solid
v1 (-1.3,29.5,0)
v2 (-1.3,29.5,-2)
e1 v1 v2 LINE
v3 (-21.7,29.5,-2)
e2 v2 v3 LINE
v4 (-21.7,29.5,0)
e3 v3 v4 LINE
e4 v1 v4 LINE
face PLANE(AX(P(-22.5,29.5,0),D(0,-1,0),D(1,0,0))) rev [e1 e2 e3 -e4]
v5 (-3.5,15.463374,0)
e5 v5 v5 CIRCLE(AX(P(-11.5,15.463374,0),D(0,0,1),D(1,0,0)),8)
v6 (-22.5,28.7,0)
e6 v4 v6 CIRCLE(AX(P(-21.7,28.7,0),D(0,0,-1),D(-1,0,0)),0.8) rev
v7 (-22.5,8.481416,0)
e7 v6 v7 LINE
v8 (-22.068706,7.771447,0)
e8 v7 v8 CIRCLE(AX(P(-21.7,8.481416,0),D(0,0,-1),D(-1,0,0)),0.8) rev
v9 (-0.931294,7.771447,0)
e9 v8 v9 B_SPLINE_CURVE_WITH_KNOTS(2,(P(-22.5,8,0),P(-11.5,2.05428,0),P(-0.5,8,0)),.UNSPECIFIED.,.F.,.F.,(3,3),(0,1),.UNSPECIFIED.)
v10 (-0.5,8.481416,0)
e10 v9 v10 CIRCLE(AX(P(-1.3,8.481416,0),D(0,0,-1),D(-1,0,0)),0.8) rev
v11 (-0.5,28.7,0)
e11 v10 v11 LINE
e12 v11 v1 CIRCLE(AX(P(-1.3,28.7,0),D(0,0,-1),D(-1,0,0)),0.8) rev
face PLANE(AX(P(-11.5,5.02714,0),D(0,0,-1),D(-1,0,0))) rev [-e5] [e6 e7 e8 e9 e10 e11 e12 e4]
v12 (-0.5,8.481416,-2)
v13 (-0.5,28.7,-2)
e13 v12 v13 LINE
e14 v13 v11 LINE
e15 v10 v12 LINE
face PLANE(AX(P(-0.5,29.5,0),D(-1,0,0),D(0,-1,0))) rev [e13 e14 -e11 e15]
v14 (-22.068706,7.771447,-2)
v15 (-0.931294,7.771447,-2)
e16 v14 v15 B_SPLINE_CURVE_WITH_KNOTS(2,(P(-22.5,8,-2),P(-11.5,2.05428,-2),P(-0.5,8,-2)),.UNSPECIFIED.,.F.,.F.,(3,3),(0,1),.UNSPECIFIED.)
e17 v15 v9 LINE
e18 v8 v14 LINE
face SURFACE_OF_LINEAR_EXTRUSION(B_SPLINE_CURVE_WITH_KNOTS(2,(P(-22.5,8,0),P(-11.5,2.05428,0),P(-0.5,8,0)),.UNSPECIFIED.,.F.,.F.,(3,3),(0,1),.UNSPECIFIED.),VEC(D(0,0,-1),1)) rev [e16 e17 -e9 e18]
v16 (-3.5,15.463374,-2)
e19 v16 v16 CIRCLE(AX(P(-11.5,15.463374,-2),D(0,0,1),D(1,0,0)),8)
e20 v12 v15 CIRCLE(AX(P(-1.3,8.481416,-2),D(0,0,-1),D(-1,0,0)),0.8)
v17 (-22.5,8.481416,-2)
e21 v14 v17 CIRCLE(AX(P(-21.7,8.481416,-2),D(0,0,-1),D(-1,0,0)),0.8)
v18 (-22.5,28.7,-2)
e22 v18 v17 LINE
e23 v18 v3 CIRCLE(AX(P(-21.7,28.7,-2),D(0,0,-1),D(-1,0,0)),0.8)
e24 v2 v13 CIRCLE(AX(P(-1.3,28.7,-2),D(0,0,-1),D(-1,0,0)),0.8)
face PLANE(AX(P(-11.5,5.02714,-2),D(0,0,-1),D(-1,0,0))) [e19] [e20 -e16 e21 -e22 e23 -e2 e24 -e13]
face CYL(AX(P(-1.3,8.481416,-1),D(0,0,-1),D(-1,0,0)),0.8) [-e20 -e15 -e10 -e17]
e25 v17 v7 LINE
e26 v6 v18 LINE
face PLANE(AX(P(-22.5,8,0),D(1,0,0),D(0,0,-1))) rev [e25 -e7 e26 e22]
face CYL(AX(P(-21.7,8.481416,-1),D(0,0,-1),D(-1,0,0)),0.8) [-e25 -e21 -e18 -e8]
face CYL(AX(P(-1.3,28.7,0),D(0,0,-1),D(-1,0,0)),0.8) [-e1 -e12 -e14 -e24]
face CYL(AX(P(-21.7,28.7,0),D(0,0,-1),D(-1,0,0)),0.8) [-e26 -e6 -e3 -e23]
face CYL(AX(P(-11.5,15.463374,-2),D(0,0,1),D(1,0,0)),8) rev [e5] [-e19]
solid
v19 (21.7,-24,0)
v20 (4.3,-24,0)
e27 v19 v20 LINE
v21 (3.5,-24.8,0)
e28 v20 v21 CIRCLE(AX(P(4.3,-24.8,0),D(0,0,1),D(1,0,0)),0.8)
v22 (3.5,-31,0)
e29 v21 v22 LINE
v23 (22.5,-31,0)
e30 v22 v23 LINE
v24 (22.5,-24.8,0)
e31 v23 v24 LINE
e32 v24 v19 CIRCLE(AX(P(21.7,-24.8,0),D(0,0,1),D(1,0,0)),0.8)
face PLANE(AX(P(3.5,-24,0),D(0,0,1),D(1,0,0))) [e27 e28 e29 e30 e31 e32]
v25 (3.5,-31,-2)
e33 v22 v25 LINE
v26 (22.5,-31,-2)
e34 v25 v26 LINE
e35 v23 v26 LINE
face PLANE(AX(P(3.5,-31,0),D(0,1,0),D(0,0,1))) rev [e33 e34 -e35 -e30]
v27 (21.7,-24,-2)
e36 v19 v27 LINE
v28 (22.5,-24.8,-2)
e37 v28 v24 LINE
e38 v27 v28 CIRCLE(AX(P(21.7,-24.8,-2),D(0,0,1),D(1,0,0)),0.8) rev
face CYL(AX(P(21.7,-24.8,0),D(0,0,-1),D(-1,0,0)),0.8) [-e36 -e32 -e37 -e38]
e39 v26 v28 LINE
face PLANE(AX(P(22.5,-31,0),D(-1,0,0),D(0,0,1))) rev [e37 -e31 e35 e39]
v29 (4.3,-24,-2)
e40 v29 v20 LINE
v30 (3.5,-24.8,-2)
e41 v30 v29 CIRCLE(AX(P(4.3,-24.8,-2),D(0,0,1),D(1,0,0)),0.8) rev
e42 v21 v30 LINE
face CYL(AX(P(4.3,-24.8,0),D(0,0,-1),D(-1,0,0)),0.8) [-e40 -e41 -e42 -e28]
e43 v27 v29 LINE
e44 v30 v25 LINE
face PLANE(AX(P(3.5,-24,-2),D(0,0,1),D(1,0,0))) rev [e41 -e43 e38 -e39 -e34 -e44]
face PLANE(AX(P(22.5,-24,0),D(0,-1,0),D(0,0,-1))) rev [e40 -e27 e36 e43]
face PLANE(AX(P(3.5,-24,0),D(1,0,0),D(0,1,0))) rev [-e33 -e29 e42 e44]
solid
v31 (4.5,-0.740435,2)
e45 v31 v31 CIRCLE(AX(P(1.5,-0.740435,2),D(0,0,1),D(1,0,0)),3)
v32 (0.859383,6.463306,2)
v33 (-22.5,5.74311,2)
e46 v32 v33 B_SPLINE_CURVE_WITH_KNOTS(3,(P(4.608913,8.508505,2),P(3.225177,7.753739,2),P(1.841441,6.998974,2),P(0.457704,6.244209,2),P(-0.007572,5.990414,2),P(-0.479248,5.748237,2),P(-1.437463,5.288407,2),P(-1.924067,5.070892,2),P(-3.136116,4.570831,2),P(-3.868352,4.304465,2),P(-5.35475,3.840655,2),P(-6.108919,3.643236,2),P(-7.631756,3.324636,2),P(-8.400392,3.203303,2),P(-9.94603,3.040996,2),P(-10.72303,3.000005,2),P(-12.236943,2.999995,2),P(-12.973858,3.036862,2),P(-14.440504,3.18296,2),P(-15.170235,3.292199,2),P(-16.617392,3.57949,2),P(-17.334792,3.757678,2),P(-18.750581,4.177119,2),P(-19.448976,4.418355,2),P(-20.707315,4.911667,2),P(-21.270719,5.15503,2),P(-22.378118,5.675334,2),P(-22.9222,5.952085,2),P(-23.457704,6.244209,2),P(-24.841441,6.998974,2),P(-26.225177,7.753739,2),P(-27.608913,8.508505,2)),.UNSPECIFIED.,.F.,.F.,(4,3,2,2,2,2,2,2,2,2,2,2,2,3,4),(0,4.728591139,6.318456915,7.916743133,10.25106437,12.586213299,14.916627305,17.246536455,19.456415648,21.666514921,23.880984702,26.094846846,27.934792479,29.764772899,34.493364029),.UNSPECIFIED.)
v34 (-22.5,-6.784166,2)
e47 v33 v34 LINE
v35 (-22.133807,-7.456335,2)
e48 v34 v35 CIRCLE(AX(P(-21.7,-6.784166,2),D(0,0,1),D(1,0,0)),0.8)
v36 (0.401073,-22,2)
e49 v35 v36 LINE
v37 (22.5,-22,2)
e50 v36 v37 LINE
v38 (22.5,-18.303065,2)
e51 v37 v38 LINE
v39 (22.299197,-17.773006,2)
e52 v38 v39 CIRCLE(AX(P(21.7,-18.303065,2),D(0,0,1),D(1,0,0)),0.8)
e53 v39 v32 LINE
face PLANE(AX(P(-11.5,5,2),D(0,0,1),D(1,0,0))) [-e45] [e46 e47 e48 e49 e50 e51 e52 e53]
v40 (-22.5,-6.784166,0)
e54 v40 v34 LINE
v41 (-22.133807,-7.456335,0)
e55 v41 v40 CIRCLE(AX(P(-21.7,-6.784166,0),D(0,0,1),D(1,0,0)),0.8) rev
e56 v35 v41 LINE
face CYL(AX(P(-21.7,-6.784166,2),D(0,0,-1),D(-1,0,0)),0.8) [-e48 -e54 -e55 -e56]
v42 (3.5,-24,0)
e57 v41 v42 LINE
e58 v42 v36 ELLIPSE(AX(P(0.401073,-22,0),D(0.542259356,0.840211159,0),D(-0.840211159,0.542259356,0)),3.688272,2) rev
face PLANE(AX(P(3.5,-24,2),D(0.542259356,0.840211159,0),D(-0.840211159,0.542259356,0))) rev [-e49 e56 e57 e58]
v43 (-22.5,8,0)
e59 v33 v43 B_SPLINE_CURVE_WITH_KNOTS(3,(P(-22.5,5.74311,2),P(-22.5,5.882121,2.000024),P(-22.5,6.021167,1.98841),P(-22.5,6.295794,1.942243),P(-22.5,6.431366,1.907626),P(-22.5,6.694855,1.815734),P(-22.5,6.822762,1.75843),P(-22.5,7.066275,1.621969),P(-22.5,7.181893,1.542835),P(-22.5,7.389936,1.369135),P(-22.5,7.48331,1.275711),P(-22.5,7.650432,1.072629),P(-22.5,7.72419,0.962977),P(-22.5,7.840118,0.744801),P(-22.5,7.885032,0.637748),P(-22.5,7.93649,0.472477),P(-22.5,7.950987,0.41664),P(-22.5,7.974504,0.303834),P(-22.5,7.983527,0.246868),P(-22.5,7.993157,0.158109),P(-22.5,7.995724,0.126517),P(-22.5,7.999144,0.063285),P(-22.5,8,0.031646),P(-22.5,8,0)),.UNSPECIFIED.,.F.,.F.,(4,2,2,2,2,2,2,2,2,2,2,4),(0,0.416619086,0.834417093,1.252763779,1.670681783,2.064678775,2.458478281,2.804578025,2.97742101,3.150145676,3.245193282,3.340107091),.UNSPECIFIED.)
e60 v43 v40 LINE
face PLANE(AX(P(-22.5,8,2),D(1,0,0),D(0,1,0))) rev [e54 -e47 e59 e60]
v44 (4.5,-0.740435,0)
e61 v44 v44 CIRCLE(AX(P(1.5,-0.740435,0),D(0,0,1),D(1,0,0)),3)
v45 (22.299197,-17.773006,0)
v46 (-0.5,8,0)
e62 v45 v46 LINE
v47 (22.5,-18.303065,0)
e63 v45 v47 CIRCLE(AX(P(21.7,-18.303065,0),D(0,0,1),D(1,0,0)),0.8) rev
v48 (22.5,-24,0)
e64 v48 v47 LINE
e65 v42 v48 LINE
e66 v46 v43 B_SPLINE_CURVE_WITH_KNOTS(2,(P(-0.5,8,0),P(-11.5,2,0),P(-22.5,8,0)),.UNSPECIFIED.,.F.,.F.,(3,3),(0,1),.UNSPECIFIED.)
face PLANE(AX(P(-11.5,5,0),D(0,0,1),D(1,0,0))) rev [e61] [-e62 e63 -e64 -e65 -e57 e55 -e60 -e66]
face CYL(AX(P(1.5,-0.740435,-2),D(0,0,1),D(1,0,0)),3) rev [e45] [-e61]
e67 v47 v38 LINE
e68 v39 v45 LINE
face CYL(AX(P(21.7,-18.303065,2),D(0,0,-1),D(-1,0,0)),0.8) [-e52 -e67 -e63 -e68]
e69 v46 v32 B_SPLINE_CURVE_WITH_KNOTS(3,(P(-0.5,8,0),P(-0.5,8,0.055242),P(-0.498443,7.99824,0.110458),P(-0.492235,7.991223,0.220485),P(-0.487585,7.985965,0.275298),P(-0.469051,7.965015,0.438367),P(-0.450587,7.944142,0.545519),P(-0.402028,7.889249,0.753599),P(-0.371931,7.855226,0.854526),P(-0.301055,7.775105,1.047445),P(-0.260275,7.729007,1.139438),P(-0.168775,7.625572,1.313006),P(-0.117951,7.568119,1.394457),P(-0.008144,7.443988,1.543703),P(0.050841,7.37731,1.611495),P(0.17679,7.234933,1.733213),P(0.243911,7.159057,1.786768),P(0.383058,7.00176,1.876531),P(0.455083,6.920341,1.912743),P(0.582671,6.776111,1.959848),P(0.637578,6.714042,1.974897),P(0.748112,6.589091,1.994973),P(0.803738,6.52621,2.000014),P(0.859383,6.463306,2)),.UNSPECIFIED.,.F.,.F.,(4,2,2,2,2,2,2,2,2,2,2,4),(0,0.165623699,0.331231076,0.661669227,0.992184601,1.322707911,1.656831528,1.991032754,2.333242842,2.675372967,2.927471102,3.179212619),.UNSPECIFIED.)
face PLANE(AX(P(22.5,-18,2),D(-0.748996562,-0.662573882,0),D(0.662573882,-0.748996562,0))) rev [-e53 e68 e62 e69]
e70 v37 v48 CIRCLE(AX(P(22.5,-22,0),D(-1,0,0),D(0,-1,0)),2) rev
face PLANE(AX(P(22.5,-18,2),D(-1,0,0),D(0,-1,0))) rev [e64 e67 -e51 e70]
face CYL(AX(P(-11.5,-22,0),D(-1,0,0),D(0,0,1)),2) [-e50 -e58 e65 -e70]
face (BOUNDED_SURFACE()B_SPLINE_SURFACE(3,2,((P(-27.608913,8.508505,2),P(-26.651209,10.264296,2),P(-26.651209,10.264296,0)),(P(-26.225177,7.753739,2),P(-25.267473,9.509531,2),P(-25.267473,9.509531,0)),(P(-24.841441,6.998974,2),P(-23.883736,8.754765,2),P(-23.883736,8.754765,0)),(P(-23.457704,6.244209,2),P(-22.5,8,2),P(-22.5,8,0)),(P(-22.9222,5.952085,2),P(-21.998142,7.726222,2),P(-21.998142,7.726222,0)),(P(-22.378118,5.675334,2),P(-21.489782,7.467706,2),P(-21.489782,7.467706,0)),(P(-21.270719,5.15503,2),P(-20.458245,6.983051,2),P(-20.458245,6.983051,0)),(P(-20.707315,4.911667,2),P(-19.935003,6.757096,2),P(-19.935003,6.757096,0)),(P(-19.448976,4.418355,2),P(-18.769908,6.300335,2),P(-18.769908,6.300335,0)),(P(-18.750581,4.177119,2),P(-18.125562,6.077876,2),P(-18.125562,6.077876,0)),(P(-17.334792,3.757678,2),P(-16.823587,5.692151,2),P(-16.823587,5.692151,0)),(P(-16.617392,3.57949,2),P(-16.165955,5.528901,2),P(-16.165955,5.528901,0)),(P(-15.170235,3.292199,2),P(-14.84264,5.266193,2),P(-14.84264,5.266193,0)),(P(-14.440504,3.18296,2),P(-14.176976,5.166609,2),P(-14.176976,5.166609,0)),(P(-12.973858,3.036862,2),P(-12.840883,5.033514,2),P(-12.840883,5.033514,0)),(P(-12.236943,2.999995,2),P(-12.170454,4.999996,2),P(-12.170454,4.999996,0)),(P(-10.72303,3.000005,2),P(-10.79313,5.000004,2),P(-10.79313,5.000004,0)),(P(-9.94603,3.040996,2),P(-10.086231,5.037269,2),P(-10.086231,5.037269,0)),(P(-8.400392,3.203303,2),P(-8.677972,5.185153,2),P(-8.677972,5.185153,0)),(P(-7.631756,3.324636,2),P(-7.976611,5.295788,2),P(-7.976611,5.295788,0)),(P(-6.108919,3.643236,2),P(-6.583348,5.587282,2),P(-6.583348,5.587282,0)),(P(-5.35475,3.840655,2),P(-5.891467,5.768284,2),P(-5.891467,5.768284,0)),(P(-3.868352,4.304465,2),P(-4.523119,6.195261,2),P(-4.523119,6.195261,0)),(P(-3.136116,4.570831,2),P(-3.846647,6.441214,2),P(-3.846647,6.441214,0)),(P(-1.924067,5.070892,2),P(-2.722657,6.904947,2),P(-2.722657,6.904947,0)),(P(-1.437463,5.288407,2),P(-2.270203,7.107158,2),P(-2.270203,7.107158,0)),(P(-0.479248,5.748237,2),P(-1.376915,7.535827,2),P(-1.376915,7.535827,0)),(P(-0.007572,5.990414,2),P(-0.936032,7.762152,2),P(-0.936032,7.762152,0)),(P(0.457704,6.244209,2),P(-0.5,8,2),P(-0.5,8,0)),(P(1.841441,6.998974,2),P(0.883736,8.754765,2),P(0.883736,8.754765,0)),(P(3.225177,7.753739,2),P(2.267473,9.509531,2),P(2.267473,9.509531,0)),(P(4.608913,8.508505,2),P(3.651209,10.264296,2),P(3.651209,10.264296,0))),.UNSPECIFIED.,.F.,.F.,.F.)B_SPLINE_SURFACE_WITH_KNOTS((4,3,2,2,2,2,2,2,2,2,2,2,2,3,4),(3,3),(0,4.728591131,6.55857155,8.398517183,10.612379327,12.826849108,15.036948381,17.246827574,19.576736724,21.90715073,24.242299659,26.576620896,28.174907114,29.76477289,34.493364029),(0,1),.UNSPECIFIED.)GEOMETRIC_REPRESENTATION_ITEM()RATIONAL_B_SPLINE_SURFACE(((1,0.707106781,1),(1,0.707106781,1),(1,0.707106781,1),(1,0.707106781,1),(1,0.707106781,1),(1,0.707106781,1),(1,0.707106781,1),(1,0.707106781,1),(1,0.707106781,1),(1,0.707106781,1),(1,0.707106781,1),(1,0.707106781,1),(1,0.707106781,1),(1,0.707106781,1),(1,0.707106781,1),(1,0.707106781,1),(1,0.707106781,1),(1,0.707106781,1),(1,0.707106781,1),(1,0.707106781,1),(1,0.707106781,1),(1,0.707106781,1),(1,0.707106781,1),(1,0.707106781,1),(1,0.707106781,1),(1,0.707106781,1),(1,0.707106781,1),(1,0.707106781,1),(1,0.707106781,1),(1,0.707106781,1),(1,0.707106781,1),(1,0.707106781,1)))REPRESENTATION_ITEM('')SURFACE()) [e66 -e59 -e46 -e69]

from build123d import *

# Parameters (mm, degrees)
BOSS_EXTRUDE1_DEPTH    = 2
SKETCH25_W             = 19
SKETCH25_H             = 7
BOSS_EXTRUDE14_DEPTH   = 2
BOSS_EXTRUDE14_2_DEPTH = 2
SKETCH26_R             = 8
CUT_EXTRUDE4_DEPTH     = 39.356876892
SKETCH27_R             = 3
CUT_EXTRUDE5_DEPTH     = 39.512984892
FILLET6_R              = 2
FILLET7_R              = 0.8
FILLET8_R              = 0.8
FILLET9_R              = 0.8


with BuildPart() as part:
    # Sketch1 → Boss-Extrude1 (new body)
    with BuildSketch(Plane.XY):
        with BuildLine():
            Line((22.5, -18), (22.5, -24))
            Line((22.5, -24), (3.5, -24))
            Line((3.5, -24), (-22.5, -7.22))
            Line((-22.5, -7.22), (-22.5, 8))
            add(Edge.make_bspline(
                [(-0.5, 8), (-11.5, 2), (-22.5, 8)],
                knots=[0, 0, 0, 1, 1, 1], degree=2))
            Line((-0.5, 8), (22.5, -18))
        make_face()
    extrude(amount=BOSS_EXTRUDE1_DEPTH)

    # Sketch27 → Cut-Extrude5 (cut, through all)
    with BuildSketch(Plane.XY.offset(2)):
        with Locations((1.5, -0.740434783)):
            Circle(SKETCH27_R)
    extrude(amount=-CUT_EXTRUDE5_DEPTH, mode=Mode.SUBTRACT)

    # Fillet6
    fillet6_edges = [part.edges().sort_by_distance(p)[0] for p in [
        (13, -24, 2),
        (-11.5, 5, 2),
    ]]
    fillet(fillet6_edges, radius=FILLET6_R - 0.0001)  # a hair under: the kernel refuses the full size

    # Fillet8
    fillet8_edges = [part.edges().sort_by_distance(p)[0] for p in [
        (22.5, -18, 1),
        (-22.5, -7.22, 1),
    ]]
    fillet(fillet8_edges, radius=FILLET8_R)


with BuildPart() as body_2:
    # Sketch25 → Boss-Extrude14 (new body)
    with BuildSketch(Plane.XY.offset(-2)):
        with Locations((13, -27.5)):
            Rectangle(SKETCH25_W, SKETCH25_H)
    extrude(amount=BOSS_EXTRUDE14_DEPTH)

    # Fillet9
    fillet9_edges = [body_2.edges().sort_by_distance(p)[0] for p in [
        (22.5, -24, -1),
        (3.5, -24, -1),
    ]]
    fillet(fillet9_edges, radius=FILLET9_R)


with BuildPart() as body_3:
    # Sketch25 → Boss-Extrude14 2 (new body)
    with BuildSketch(Plane.XY.offset(-2)):
        with BuildLine():
            Line((-22.5, 8), (-22.5, 29.5))
            Line((-22.5, 29.5), (-0.5, 29.5))
            Line((-0.5, 29.5), (-0.5, 8))
            add(Edge.make_bspline(
                [(-22.5, 8), (-11.5, 2.054280429), (-0.5, 8)],
                knots=[0, 0, 0, 1, 1, 1], degree=2))
        make_face()
    extrude(amount=BOSS_EXTRUDE14_2_DEPTH)

    # Sketch26 → Cut-Extrude4 (cut, through all)
    with BuildSketch(Plane.XY):
        with Locations((-11.5, 15.463373966)):
            Circle(SKETCH26_R)
    extrude(amount=-CUT_EXTRUDE4_DEPTH, mode=Mode.SUBTRACT)

    # Fillet7
    fillet7_edges = [body_3.edges().sort_by_distance(p)[0] for p in [
        (-0.5, 8, -1),
        (-22.5, 8, -1),
        (-0.5, 29.5, -1),
        (-22.5, 29.5, -1),
    ]]
    fillet(fillet7_edges, radius=FILLET7_R)


solid = Compound([part.part, body_2.part, body_3.part])
